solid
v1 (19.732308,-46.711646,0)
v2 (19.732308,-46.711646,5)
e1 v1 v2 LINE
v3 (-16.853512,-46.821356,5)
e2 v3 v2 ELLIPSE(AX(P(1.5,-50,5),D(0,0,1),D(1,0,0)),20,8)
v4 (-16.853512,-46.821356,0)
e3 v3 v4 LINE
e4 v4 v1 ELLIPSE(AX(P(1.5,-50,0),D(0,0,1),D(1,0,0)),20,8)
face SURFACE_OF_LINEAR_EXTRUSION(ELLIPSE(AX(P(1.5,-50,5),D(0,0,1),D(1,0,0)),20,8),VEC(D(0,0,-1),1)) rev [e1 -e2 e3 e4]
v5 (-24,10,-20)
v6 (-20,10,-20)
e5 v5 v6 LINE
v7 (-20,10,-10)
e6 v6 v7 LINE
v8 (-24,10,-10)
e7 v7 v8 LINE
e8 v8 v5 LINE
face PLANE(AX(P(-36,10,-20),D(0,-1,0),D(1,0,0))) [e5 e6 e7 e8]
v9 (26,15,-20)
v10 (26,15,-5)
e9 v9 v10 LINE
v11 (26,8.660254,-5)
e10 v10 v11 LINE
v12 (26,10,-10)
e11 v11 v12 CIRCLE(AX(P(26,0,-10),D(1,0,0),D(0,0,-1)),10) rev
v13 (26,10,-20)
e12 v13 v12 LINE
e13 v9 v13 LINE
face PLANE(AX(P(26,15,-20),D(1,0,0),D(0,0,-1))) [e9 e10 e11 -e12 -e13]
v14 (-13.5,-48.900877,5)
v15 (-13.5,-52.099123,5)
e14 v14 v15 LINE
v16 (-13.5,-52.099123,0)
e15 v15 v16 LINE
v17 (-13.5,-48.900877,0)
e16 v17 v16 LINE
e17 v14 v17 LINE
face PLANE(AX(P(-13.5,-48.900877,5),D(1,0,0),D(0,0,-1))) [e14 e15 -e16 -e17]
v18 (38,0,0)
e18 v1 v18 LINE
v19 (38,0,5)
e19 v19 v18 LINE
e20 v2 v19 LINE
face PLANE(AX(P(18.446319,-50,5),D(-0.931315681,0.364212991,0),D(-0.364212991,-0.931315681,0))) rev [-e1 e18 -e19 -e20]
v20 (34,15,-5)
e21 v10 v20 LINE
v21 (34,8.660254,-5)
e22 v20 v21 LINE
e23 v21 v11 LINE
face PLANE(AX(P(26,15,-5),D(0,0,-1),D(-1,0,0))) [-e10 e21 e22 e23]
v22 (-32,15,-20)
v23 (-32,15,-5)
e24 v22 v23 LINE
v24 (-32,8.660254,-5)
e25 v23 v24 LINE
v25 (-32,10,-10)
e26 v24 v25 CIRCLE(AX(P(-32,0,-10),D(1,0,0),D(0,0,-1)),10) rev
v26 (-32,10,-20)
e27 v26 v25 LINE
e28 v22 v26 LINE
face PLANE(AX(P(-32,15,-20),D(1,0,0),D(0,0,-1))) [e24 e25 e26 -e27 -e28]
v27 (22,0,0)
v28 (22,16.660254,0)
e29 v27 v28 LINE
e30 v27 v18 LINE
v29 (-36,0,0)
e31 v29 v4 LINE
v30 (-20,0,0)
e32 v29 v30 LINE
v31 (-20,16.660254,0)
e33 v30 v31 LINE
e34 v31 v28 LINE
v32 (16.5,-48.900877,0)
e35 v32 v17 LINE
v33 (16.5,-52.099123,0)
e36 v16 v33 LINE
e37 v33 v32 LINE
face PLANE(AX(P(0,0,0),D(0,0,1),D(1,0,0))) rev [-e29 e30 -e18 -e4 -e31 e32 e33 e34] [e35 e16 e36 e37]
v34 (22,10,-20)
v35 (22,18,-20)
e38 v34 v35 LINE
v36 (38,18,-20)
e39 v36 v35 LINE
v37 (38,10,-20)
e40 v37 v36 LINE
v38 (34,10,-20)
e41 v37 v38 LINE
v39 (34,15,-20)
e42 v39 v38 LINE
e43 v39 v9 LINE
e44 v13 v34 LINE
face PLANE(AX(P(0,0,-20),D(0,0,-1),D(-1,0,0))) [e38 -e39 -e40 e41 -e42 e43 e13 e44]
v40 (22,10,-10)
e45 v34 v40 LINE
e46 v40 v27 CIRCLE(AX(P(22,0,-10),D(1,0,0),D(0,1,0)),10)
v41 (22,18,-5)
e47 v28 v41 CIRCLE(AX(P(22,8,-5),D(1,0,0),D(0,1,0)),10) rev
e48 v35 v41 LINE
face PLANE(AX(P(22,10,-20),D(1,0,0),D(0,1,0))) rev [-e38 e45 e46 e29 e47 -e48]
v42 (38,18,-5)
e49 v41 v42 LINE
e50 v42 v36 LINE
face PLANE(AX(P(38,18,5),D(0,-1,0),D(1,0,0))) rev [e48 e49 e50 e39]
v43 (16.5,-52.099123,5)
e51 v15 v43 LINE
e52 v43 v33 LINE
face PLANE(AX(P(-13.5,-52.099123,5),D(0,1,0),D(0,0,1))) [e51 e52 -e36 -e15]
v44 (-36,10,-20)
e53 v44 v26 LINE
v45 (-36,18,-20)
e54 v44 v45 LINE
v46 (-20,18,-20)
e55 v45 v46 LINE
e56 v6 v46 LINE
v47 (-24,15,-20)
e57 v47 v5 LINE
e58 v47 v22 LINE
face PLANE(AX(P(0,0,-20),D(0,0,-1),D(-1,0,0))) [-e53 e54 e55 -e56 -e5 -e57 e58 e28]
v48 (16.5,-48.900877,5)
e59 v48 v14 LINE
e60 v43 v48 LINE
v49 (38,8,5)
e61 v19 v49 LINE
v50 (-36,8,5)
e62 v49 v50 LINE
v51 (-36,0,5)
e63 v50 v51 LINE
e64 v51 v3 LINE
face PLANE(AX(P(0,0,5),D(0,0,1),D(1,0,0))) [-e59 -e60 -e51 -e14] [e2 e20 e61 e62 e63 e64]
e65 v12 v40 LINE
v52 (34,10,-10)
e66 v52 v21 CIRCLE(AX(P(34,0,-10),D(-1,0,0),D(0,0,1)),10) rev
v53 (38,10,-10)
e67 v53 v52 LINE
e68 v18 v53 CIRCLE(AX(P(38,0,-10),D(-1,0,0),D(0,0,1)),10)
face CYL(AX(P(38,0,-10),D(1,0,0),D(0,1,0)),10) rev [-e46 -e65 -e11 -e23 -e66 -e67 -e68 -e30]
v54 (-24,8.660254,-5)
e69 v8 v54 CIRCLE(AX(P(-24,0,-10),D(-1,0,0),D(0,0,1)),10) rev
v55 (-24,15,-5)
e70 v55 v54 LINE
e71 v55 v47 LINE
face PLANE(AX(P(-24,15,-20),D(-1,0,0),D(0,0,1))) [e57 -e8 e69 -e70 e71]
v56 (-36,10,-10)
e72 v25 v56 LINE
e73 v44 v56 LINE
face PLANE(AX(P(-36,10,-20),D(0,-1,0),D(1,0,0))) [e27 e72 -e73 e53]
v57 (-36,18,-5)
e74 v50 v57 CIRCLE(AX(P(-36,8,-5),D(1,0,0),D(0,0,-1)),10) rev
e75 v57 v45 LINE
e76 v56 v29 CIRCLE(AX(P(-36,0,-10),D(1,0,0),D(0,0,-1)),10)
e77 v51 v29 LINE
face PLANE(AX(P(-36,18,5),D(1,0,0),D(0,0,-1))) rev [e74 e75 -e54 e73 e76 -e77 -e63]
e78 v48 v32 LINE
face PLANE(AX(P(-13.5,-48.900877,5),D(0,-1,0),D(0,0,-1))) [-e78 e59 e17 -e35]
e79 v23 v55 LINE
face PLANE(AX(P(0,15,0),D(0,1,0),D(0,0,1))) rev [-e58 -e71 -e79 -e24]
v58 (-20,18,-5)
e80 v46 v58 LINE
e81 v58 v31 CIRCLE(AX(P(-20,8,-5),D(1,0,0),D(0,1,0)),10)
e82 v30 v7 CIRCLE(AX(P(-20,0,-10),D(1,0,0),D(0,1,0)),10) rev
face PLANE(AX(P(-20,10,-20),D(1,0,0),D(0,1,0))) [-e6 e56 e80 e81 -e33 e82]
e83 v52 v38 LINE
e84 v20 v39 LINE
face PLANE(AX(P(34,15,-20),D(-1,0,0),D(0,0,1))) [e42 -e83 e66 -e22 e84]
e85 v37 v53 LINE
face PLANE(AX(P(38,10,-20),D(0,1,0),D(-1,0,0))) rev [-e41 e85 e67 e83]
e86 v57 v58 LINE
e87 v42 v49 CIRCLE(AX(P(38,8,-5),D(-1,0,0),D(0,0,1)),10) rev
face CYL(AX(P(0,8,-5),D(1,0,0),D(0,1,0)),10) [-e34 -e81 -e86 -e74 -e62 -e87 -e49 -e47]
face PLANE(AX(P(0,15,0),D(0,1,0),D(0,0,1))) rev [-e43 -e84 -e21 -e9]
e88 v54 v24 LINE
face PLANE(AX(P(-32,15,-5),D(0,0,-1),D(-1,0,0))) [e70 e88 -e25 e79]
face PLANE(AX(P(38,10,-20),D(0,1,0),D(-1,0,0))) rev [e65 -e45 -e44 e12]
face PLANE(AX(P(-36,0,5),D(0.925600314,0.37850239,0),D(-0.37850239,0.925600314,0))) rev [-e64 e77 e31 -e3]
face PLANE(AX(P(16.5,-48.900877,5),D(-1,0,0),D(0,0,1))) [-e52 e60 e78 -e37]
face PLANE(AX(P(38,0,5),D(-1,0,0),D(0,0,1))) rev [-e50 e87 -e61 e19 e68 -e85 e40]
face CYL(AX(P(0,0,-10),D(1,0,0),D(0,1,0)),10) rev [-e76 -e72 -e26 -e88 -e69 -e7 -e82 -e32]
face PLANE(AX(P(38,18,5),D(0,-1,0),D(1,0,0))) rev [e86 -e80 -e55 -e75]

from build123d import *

# Parameters (mm, degrees)
PLATE_FEATURE_DEPTH        = 5
STRAP_FEATURE_SKETCH_RX    = 20
STRAP_FEATURE_SKETCH_RY    = 8
STRAP_FEATURE_DEPTH        = 5
STRAP_CUT_SKETCH_W         = 30
STRAP_CUT_SKETCH_H         = 3.19824666
STRAP_CUT_DEPTH            = 5
LEFT_LEG_FEATURE_SKETCH_W  = 16
LEFT_LEG_FEATURE_SKETCH_H  = 8
LEFT_LEG_FEATURE_DEPTH     = 20
RIGHT_LEG_FEATURE_SKETCH_W = 16
RIGHT_LEG_FEATURE_SKETCH_H = 8
RIGHT_LEG_FEATURE_DEPTH    = 20
TAB_CUT_SKETCH_W           = 8
TAB_CUT_SKETCH_H           = 15
TAB_CUT_DEPTH              = 5
FILLET1_R                  = 10
FILLET2_R                  = 10
FILLET3_R                  = 10


with BuildPart() as part:
    # Plate Feature Sketch → Plate Feature (new body)
    with BuildSketch(Plane.XY):
        Polygon((-36, 18), (-36, 0), (-15.55368079, -50), (18.44631921, -50), (38, 0), (38, 18), align=None)
    extrude(amount=PLATE_FEATURE_DEPTH)

    # Strap Feature Sketch → Strap Feature (add)
    with BuildSketch(Plane.XY):
        with Locations((1.5, -50)):
            Ellipse(STRAP_FEATURE_SKETCH_RX, STRAP_FEATURE_SKETCH_RY)
    extrude(amount=STRAP_FEATURE_DEPTH)

    # Strap Cut Sketch → Strap Cut (cut)
    with BuildSketch(Plane.XY):
        with Locations((1.5, -50.5)):
            Rectangle(STRAP_CUT_SKETCH_W, STRAP_CUT_SKETCH_H)
    extrude(amount=STRAP_CUT_DEPTH, mode=Mode.SUBTRACT)

    # Left Leg Feature Sketch → Left Leg Feature (add)
    with BuildSketch(Plane.XY):
        with Locations((30, 14)):
            Rectangle(LEFT_LEG_FEATURE_SKETCH_W, LEFT_LEG_FEATURE_SKETCH_H)
    extrude(amount=-LEFT_LEG_FEATURE_DEPTH)

    # Right Leg Feature Sketch → Right Leg Feature (add)
    with BuildSketch(Plane.XY):
        with Locations((-28, 14)):
            Rectangle(RIGHT_LEG_FEATURE_SKETCH_W, RIGHT_LEG_FEATURE_SKETCH_H)
    extrude(amount=-RIGHT_LEG_FEATURE_DEPTH)

    # Tab Cut Sketch → Tab Cut (cut)
    with BuildSketch(Plane(origin=(0, 10, 0), x_dir=(1, 0, 0), z_dir=(0, 1, 0))):
        with Locations((-28, 12.5)):
            Rectangle(TAB_CUT_SKETCH_W, TAB_CUT_SKETCH_H)
        with Locations((30, 12.5)):
            Rectangle(TAB_CUT_SKETCH_W, TAB_CUT_SKETCH_H)
    extrude(amount=TAB_CUT_DEPTH, mode=Mode.SUBTRACT)

    # Fillet1
    # the kernel refuses this fillet: 10 mm, written as the material it takes off along each edge
    with BuildSketch(Plane(origin=(63, 18, 5), x_dir=(0, 0, -1), z_dir=(-1, 0, 0))) as fillet1_piece_1:
        with BuildLine():
            CenterArc((FILLET1_R, FILLET1_R), FILLET1_R, 180, 90)
            Line((0, FILLET1_R), (0, 0))
            Line((0, 0), (FILLET1_R, 0))
        make_face()
    extrude(amount=124, mode=Mode.SUBTRACT)

    # Fillet2
    # the kernel refuses this fillet: 10 mm, written as the material it adds along each edge
    with BuildSketch(Plane(origin=(-36, 10, 0), x_dir=(0, 0, -1), z_dir=(1, 0, 0))) as fillet2_piece_1_section:
        with BuildLine():
            CenterArc((FILLET2_R, -FILLET2_R), FILLET2_R, 90, 90)
            Line((0, -FILLET2_R), (0, 0))
            Line((0, 0), (FILLET2_R, 0))
        make_face()
    fillet2_piece_1 = extrude(amount=16, mode=Mode.PRIVATE)
    fillet2_piece_1 = split(fillet2_piece_1, bisect_by=Plane(origin=(-34, 9.759916183, -5), z_dir=(0, 0, -1)), keep=Keep.TOP, mode=Mode.PRIVATE)
    fillet2_piece_1 = split(fillet2_piece_1, bisect_by=Plane(origin=(-32, 9.759916183, -6.632507845), z_dir=(-1, 0, 0)), keep=Keep.TOP, mode=Mode.PRIVATE)
    add(fillet2_piece_1)
    with BuildSketch(Plane(origin=(-36, 10, 0), x_dir=(0, 0, -1), z_dir=(1, 0, 0))) as fillet2_piece_2_section:
        with BuildLine():
            CenterArc((FILLET2_R, -FILLET2_R), FILLET2_R, 90, 90)
            Line((0, -FILLET2_R), (0, 0))
            Line((0, 0), (FILLET2_R, 0))
        make_face()
    fillet2_piece_2 = extrude(amount=16, mode=Mode.PRIVATE)
    fillet2_piece_2 = split(fillet2_piece_2, bisect_by=Plane(origin=(-34, 7.4487994, -5), z_dir=(0, 0, 1)), keep=Keep.TOP, mode=Mode.PRIVATE)
    fillet2_piece_2 = split(fillet2_piece_2, bisect_by=Plane(origin=(-32, 7.4487994, -1.643917643), z_dir=(-1, 0, 0)), keep=Keep.TOP, mode=Mode.PRIVATE)
    add(fillet2_piece_2)
    with BuildSketch(Plane(origin=(-36, 10, 0), x_dir=(0, 0, -1), z_dir=(1, 0, 0))) as fillet2_piece_3_section:
        with BuildLine():
            CenterArc((FILLET2_R, -FILLET2_R), FILLET2_R, 90, 90)
            Line((0, -FILLET2_R), (0, 0))
            Line((0, 0), (FILLET2_R, 0))
        make_face()
    fillet2_piece_3 = extrude(amount=16, mode=Mode.PRIVATE)
    fillet2_piece_3 = split(fillet2_piece_3, bisect_by=Plane(origin=(-24, 7.4487994, -1.643917643), z_dir=(-1, 0, 0)), keep=Keep.TOP, mode=Mode.PRIVATE)
    fillet2_piece_3 = split(fillet2_piece_3, bisect_by=Plane(origin=(-28, 7.4487994, -5), z_dir=(0, 0, 1)), keep=Keep.TOP, mode=Mode.PRIVATE)
    fillet2_piece_3 = split(fillet2_piece_3, bisect_by=Plane(origin=(-32, 7.4487994, -1.643917643), z_dir=(1, 0, 0)), keep=Keep.TOP, mode=Mode.PRIVATE)
    add(fillet2_piece_3)
    with BuildSketch(Plane(origin=(-36, 10, 0), x_dir=(0, 0, -1), z_dir=(1, 0, 0))) as fillet2_piece_4_section:
        with BuildLine():
            CenterArc((FILLET2_R, -FILLET2_R), FILLET2_R, 90, 90)
            Line((0, -FILLET2_R), (0, 0))
            Line((0, 0), (FILLET2_R, 0))
        make_face()
    fillet2_piece_4 = extrude(amount=16, mode=Mode.PRIVATE)
    fillet2_piece_4 = split(fillet2_piece_4, bisect_by=Plane(origin=(-24, 9.759916183, -6.632507845), z_dir=(1, 0, 0)), keep=Keep.TOP, mode=Mode.PRIVATE)
    fillet2_piece_4 = split(fillet2_piece_4, bisect_by=Plane(origin=(-22, 9.759916183, -5), z_dir=(0, 0, -1)), keep=Keep.TOP, mode=Mode.PRIVATE)
    add(fillet2_piece_4)
    with BuildSketch(Plane(origin=(-36, 10, 0), x_dir=(0, 0, -1), z_dir=(1, 0, 0))) as fillet2_piece_5_section:
        with BuildLine():
            CenterArc((FILLET2_R, -FILLET2_R), FILLET2_R, 90, 90)
            Line((0, -FILLET2_R), (0, 0))
            Line((0, 0), (FILLET2_R, 0))
        make_face()
    fillet2_piece_5 = extrude(amount=16, mode=Mode.PRIVATE)
    fillet2_piece_5 = split(fillet2_piece_5, bisect_by=Plane(origin=(-24, 7.4487994, -1.643917643), z_dir=(1, 0, 0)), keep=Keep.TOP, mode=Mode.PRIVATE)
    fillet2_piece_5 = split(fillet2_piece_5, bisect_by=Plane(origin=(-22, 7.4487994, -5), z_dir=(0, 0, 1)), keep=Keep.TOP, mode=Mode.PRIVATE)
    add(fillet2_piece_5)

    # Fillet3
    # the kernel refuses this fillet: 10 mm, written as the material it adds along each edge
    with BuildSketch(Plane(origin=(38, 10, 0), x_dir=(0, 0, -1), z_dir=(-1, 0, 0))) as fillet3_piece_1_section:
        with BuildLine():
            CenterArc((FILLET3_R, FILLET3_R), FILLET3_R, 180, 90)
            Line((0, FILLET3_R), (0, 0))
            Line((0, 0), (FILLET3_R, 0))
        make_face()
    fillet3_piece_1 = extrude(amount=16, mode=Mode.PRIVATE)
    fillet3_piece_1 = split(fillet3_piece_1, bisect_by=Plane(origin=(36, 9.759916183, -5), z_dir=(0, 0, -1)), keep=Keep.TOP, mode=Mode.PRIVATE)
    fillet3_piece_1 = split(fillet3_piece_1, bisect_by=Plane(origin=(34, 9.759916183, -6.632507845), z_dir=(1, 0, 0)), keep=Keep.TOP, mode=Mode.PRIVATE)
    add(fillet3_piece_1)
    with BuildSketch(Plane(origin=(38, 10, 0), x_dir=(0, 0, -1), z_dir=(-1, 0, 0))) as fillet3_piece_2_section:
        with BuildLine():
            CenterArc((FILLET3_R, FILLET3_R), FILLET3_R, 180, 90)
            Line((0, FILLET3_R), (0, 0))
            Line((0, 0), (FILLET3_R, 0))
        make_face()
    fillet3_piece_2 = extrude(amount=16, mode=Mode.PRIVATE)
    fillet3_piece_2 = split(fillet3_piece_2, bisect_by=Plane(origin=(36, 7.4487994, -5), z_dir=(0, 0, 1)), keep=Keep.TOP, mode=Mode.PRIVATE)
    fillet3_piece_2 = split(fillet3_piece_2, bisect_by=Plane(origin=(34, 7.4487994, -1.643917643), z_dir=(1, 0, 0)), keep=Keep.TOP, mode=Mode.PRIVATE)
    add(fillet3_piece_2)
    with BuildSketch(Plane(origin=(38, 10, 0), x_dir=(0, 0, -1), z_dir=(-1, 0, 0))) as fillet3_piece_3_section:
        with BuildLine():
            CenterArc((FILLET3_R, FILLET3_R), FILLET3_R, 180, 90)
            Line((0, FILLET3_R), (0, 0))
            Line((0, 0), (FILLET3_R, 0))
        make_face()
    fillet3_piece_3 = extrude(amount=16, mode=Mode.PRIVATE)
    fillet3_piece_3 = split(fillet3_piece_3, bisect_by=Plane(origin=(26, 7.4487994, -1.643917643), z_dir=(1, 0, 0)), keep=Keep.TOP, mode=Mode.PRIVATE)
    fillet3_piece_3 = split(fillet3_piece_3, bisect_by=Plane(origin=(30, 7.4487994, -5), z_dir=(0, 0, 1)), keep=Keep.TOP, mode=Mode.PRIVATE)
    fillet3_piece_3 = split(fillet3_piece_3, bisect_by=Plane(origin=(34, 7.4487994, -1.643917643), z_dir=(-1, 0, 0)), keep=Keep.TOP, mode=Mode.PRIVATE)
    add(fillet3_piece_3)
    with BuildSketch(Plane(origin=(38, 10, 0), x_dir=(0, 0, -1), z_dir=(-1, 0, 0))) as fillet3_piece_4_section:
        with BuildLine():
            CenterArc((FILLET3_R, FILLET3_R), FILLET3_R, 180, 90)
            Line((0, FILLET3_R), (0, 0))
            Line((0, 0), (FILLET3_R, 0))
        make_face()
    fillet3_piece_4 = extrude(amount=16, mode=Mode.PRIVATE)
    fillet3_piece_4 = split(fillet3_piece_4, bisect_by=Plane(origin=(26, 9.759916183, -6.632507845), z_dir=(-1, 0, 0)), keep=Keep.TOP, mode=Mode.PRIVATE)
    fillet3_piece_4 = split(fillet3_piece_4, bisect_by=Plane(origin=(24, 9.759916183, -5), z_dir=(0, 0, -1)), keep=Keep.TOP, mode=Mode.PRIVATE)
    add(fillet3_piece_4)
    with BuildSketch(Plane(origin=(38, 10, 0), x_dir=(0, 0, -1), z_dir=(-1, 0, 0))) as fillet3_piece_5_section:
        with BuildLine():
            CenterArc((FILLET3_R, FILLET3_R), FILLET3_R, 180, 90)
            Line((0, FILLET3_R), (0, 0))
            Line((0, 0), (FILLET3_R, 0))
        make_face()
    fillet3_piece_5 = extrude(amount=16, mode=Mode.PRIVATE)
    fillet3_piece_5 = split(fillet3_piece_5, bisect_by=Plane(origin=(26, 7.4487994, -1.643917643), z_dir=(-1, 0, 0)), keep=Keep.TOP, mode=Mode.PRIVATE)
    fillet3_piece_5 = split(fillet3_piece_5, bisect_by=Plane(origin=(24, 7.4487994, -5), z_dir=(0, 0, 1)), keep=Keep.TOP, mode=Mode.PRIVATE)
    add(fillet3_piece_5)


solid = part.part
